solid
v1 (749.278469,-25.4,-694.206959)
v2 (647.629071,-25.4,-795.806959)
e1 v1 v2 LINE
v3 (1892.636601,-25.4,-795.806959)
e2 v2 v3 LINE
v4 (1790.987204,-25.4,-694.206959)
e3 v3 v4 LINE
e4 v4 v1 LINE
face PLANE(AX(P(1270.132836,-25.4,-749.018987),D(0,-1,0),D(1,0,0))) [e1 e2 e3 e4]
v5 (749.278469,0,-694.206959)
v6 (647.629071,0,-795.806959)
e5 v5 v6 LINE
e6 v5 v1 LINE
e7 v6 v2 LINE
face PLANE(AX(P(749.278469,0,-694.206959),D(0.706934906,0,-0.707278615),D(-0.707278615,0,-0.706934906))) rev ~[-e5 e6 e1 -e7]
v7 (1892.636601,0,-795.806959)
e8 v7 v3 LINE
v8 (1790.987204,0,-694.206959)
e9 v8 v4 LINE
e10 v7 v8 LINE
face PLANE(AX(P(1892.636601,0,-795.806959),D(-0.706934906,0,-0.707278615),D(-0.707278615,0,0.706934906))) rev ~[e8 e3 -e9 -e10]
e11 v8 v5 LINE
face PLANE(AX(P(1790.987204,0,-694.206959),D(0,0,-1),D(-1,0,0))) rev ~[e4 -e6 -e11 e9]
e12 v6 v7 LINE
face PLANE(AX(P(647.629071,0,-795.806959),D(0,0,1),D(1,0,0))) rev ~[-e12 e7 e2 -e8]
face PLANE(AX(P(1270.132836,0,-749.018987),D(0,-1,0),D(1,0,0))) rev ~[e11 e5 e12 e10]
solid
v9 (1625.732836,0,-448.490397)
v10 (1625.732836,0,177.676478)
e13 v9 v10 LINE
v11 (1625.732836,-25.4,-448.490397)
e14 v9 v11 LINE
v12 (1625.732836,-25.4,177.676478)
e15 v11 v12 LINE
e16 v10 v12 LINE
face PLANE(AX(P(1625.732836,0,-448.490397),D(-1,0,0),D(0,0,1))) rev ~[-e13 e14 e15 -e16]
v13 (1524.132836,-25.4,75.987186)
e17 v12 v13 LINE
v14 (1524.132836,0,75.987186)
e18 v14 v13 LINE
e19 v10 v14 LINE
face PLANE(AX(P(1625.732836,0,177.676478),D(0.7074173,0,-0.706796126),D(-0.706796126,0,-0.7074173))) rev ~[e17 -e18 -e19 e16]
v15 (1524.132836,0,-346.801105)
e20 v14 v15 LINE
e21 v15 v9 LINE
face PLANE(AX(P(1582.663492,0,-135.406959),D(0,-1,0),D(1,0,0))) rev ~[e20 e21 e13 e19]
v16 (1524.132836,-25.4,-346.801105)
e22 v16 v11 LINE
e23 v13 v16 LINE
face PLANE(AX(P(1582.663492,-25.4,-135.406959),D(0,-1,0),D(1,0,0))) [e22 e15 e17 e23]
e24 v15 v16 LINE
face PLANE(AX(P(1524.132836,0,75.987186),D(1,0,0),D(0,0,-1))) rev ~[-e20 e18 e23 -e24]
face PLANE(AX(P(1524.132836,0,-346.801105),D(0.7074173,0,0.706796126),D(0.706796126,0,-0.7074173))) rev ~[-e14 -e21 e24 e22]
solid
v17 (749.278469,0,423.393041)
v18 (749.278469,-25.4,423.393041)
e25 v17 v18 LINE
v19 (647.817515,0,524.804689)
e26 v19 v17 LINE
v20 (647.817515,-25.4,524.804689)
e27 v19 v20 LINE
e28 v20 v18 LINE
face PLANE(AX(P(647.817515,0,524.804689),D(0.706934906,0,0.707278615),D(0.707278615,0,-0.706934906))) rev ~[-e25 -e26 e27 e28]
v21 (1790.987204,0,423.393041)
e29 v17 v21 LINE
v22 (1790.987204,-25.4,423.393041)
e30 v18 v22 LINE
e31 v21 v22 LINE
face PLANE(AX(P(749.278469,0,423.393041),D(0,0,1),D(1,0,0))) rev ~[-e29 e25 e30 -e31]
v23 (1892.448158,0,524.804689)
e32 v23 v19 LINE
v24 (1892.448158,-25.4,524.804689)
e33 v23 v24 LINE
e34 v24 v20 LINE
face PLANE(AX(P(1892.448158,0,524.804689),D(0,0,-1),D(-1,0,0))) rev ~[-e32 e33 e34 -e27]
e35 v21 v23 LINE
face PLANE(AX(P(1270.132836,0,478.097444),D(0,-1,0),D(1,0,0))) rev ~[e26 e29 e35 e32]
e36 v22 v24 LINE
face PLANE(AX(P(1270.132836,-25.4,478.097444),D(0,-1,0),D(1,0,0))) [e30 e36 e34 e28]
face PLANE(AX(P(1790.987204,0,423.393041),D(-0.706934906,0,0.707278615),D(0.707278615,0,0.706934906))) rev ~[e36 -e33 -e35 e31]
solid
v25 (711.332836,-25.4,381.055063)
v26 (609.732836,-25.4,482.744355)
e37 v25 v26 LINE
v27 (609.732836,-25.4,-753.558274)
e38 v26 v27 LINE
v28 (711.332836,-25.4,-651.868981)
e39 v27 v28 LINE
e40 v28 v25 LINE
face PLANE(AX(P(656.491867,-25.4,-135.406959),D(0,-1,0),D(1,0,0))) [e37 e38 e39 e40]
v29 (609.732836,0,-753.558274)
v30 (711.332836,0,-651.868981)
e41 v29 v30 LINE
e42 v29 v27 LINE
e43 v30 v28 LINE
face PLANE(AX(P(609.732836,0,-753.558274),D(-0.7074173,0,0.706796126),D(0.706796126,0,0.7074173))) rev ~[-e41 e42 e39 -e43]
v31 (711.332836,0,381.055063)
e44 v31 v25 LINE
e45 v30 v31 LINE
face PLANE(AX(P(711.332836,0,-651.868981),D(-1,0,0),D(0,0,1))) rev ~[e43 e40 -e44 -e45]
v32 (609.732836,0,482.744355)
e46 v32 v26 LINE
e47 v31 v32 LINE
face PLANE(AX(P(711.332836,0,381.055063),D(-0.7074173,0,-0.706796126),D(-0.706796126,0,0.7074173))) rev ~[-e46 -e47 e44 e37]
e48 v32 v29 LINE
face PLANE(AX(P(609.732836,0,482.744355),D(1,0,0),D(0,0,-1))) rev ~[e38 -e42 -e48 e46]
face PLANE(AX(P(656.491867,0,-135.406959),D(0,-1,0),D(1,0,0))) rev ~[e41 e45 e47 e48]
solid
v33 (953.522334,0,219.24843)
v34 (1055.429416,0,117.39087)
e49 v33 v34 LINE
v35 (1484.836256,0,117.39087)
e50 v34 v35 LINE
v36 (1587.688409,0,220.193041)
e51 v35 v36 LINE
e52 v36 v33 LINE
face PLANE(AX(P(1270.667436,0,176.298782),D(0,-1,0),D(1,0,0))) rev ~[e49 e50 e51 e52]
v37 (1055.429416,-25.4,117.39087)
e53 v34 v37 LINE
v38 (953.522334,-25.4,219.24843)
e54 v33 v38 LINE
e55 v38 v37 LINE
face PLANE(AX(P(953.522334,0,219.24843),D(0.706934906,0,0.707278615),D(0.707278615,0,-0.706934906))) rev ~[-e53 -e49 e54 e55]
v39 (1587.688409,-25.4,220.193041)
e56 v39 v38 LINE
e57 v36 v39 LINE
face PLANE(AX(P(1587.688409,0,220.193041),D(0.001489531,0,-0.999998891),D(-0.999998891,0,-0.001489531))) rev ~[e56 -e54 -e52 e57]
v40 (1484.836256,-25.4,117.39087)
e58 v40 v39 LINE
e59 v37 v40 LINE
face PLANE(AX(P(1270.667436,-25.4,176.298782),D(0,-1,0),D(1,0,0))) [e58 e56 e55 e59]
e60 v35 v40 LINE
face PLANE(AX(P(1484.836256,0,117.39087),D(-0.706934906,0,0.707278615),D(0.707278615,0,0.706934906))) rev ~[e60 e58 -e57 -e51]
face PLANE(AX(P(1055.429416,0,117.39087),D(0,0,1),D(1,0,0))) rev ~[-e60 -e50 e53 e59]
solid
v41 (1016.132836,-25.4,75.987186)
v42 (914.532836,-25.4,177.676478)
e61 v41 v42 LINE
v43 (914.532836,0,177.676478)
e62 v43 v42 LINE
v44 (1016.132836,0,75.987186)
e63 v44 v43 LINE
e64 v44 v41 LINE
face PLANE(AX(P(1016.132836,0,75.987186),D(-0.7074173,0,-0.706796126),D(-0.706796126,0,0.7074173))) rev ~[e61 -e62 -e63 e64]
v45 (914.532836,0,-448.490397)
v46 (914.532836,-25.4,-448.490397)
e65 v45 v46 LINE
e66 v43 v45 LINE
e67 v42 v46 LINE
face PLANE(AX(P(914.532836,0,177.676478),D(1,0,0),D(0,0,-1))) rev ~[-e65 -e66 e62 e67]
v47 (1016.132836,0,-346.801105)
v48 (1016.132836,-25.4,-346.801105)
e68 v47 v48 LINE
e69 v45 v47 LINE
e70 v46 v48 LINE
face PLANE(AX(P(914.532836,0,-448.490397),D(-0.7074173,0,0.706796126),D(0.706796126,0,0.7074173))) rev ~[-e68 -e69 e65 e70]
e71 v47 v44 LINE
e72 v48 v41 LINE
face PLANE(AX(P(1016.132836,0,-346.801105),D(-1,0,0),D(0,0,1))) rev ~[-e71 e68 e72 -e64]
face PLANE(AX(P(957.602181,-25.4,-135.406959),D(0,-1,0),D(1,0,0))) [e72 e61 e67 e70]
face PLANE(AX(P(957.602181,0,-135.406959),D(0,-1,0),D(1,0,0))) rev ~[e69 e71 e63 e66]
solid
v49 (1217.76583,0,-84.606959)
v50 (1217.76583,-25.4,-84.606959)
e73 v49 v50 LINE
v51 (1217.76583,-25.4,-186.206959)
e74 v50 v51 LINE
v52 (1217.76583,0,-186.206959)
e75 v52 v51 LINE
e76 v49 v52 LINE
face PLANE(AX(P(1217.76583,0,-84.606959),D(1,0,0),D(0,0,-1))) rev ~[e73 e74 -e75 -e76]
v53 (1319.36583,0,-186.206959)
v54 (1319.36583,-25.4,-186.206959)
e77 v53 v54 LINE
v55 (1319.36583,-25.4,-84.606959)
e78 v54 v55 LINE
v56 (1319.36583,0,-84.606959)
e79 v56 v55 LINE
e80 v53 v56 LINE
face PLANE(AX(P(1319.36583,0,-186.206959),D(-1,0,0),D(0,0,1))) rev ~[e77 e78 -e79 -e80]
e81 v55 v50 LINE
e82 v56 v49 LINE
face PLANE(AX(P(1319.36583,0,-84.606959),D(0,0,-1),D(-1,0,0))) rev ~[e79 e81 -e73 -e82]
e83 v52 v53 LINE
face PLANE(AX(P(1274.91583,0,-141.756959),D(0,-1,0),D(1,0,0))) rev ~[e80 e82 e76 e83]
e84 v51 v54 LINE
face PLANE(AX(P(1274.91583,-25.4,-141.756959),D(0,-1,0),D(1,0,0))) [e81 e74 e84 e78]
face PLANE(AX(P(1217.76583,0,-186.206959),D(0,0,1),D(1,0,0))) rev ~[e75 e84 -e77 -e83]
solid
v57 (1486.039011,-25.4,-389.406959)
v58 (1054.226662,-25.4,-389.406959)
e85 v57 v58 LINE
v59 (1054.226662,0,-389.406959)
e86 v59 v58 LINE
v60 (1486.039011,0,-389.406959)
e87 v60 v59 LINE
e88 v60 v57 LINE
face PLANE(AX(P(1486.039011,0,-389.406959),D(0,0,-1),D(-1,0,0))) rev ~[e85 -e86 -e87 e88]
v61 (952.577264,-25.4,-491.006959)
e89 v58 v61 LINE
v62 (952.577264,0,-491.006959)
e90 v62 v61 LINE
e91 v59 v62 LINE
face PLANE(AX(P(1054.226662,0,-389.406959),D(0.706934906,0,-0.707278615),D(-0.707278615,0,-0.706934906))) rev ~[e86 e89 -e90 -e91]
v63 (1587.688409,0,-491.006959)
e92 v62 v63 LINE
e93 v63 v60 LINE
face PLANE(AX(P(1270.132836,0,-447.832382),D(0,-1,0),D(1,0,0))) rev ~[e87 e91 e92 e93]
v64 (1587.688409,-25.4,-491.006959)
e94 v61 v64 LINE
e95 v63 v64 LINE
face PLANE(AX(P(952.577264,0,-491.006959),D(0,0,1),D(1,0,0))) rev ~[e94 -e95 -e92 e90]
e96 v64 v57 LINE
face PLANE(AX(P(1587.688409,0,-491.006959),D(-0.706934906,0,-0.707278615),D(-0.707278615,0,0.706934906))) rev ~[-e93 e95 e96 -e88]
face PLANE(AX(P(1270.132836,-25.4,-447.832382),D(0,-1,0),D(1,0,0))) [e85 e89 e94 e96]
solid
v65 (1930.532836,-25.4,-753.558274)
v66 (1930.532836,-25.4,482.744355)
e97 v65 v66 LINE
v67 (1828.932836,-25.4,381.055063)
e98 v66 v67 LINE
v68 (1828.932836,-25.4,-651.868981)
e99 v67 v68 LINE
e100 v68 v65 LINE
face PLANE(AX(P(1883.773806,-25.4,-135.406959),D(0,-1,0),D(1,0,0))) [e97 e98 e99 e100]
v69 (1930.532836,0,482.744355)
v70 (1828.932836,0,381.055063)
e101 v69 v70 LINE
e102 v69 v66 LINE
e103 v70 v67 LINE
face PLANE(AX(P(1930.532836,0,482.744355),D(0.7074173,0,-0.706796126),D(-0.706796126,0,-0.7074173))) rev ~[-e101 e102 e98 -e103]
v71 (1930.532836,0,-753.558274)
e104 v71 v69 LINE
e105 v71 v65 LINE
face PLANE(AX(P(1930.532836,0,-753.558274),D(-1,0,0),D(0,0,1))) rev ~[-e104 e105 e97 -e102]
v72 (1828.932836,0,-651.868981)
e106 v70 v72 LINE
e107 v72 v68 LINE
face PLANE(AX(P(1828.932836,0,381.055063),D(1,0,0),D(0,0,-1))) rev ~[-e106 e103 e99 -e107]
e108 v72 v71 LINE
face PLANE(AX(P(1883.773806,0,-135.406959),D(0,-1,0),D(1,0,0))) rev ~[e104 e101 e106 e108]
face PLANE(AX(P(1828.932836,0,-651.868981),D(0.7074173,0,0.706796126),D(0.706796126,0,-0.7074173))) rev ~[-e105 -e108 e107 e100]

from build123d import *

# Parameters (mm, degrees)
F1_DEPTH = 25.4


with BuildPart() as f1:
    # F0 (on Front) → F1 (new body)
    with BuildSketch(Plane.XZ):
        Polygon((1217.7658302538, -186.2069594315), (1319.3658302538, -186.2069594315), (1319.3658302538, -84.6069594315), (1268.5658302538, -84.6069594315), (1268.5658302538, -135.4069594315), (1217.7658302538, -135.4069594315), align=None)
        Polygon((1268.5658302538, -84.6069594315), (1217.7658302538, -84.6069594315), (1217.7658302538, -84.6383770839), (1217.7658302538, -135.4069594315), (1268.5658302538, -135.4069594315), align=None)
    extrude(amount=F1_DEPTH)


with BuildPart() as f1b:
    # F0 (on Front) → F1, piece 2 (new body)
    with BuildSketch(Plane.XZ):
        Polygon((953.5223343681, 219.2484295396), (1055.429416395, 117.3908703306), (1484.8362563349, 117.3908703306), (1587.6884086575, 220.1930405685), align=None)
    extrude(amount=F1_DEPTH)


with BuildPart() as f1c:
    # F0 (on Front) → F1, piece 3 (new body)
    with BuildSketch(Plane.XZ):
        Polygon((1016.132836365, 63.2760249292), (1016.132836365, 75.9871864359), (914.532836365, 177.6764784897), (914.532836365, 169.5246078354), (914.532836365, -135.4069594315), (914.532836365, -448.4903973526), (1016.132836365, -346.8011052989), (1016.132836365, -135.4069594315), align=None)
    extrude(amount=F1_DEPTH)


with BuildPart() as f1d:
    # F0 (on Front) → F1, piece 4 (new body)
    with BuildSketch(Plane.XZ):
        Polygon((647.8175146307, 524.8046888061), (749.2784688856, 423.3930405685), (753.6708143363, 423.3930405685), (1270.132836365, 423.3930405685), (1786.5948583937, 423.3930405685), (1790.9872038444, 423.3930405685), (1892.4481580993, 524.8046888061), align=None)
    extrude(amount=F1_DEPTH)


with BuildPart() as f1e:
    # F0 (on Front) → F1, piece 5 (new body)
    with BuildSketch(Plane.XZ):
        Polygon((1625.732836365, 177.6764784897), (1524.132836365, 75.9871864359), (1524.132836365, -135.4069594315), (1524.132836365, -346.8011052989), (1625.732836365, -448.4903973526), (1625.732836365, -135.4069594315), align=None)
    extrude(amount=F1_DEPTH)


with BuildPart() as f1f:
    # F0 (on Front) → F1, piece 6 (new body)
    with BuildSketch(Plane.XZ):
        Polygon((1058.7386904976, -389.4069594315), (1054.2266616658, -389.4069594315), (952.5772640724, -491.0069594315), (1270.132836365, -491.0069594315), (1587.6884086575, -491.0069594315), (1486.0390110641, -389.4069594315), (1481.5269822323, -389.4069594315), (1270.132836365, -389.4069594315), align=None)
    extrude(amount=F1_DEPTH)


with BuildPart() as f1g:
    # F0 (on Front) → F1, piece 7 (new body)
    with BuildSketch(Plane.XZ):
        Polygon((711.332836365, 368.3439010905), (711.332836365, 381.0550625972), (609.732836365, 482.744354651), (609.732836365, -135.4069594315), (609.732836365, -753.558273514), (711.332836365, -651.8689814602), (711.332836365, -135.4069594315), align=None)
    extrude(amount=F1_DEPTH)


with BuildPart() as f1h:
    # F0 (on Front) → F1, piece 8 (new body)
    with BuildSketch(Plane.XZ):
        Polygon((1930.532836365, 482.744354651), (1828.932836365, 381.0550625972), (1828.932836365, -135.4069594315), (1828.932836365, -651.8689814602), (1930.532836365, -753.558273514), (1930.532836365, -135.4069594315), align=None)
    extrude(amount=F1_DEPTH)


with BuildPart() as f1i:
    # F0 (on Front) → F1, piece 9 (new body)
    with BuildSketch(Plane.XZ):
        Polygon((753.6708143363, -694.2069594315), (749.2784688856, -694.2069594315), (647.6290712922, -795.8069594315), (1270.132836365, -795.8069594315), (1892.6366014378, -795.8069594315), (1790.9872038443, -694.2069594315), (1786.5948583937, -694.2069594315), (1270.132836365, -694.2069594315), align=None)
    extrude(amount=F1_DEPTH)


solid = Compound([f1.part, f1b.part, f1c.part, f1d.part, f1e.part, f1f.part, f1g.part, f1h.part, f1i.part])
